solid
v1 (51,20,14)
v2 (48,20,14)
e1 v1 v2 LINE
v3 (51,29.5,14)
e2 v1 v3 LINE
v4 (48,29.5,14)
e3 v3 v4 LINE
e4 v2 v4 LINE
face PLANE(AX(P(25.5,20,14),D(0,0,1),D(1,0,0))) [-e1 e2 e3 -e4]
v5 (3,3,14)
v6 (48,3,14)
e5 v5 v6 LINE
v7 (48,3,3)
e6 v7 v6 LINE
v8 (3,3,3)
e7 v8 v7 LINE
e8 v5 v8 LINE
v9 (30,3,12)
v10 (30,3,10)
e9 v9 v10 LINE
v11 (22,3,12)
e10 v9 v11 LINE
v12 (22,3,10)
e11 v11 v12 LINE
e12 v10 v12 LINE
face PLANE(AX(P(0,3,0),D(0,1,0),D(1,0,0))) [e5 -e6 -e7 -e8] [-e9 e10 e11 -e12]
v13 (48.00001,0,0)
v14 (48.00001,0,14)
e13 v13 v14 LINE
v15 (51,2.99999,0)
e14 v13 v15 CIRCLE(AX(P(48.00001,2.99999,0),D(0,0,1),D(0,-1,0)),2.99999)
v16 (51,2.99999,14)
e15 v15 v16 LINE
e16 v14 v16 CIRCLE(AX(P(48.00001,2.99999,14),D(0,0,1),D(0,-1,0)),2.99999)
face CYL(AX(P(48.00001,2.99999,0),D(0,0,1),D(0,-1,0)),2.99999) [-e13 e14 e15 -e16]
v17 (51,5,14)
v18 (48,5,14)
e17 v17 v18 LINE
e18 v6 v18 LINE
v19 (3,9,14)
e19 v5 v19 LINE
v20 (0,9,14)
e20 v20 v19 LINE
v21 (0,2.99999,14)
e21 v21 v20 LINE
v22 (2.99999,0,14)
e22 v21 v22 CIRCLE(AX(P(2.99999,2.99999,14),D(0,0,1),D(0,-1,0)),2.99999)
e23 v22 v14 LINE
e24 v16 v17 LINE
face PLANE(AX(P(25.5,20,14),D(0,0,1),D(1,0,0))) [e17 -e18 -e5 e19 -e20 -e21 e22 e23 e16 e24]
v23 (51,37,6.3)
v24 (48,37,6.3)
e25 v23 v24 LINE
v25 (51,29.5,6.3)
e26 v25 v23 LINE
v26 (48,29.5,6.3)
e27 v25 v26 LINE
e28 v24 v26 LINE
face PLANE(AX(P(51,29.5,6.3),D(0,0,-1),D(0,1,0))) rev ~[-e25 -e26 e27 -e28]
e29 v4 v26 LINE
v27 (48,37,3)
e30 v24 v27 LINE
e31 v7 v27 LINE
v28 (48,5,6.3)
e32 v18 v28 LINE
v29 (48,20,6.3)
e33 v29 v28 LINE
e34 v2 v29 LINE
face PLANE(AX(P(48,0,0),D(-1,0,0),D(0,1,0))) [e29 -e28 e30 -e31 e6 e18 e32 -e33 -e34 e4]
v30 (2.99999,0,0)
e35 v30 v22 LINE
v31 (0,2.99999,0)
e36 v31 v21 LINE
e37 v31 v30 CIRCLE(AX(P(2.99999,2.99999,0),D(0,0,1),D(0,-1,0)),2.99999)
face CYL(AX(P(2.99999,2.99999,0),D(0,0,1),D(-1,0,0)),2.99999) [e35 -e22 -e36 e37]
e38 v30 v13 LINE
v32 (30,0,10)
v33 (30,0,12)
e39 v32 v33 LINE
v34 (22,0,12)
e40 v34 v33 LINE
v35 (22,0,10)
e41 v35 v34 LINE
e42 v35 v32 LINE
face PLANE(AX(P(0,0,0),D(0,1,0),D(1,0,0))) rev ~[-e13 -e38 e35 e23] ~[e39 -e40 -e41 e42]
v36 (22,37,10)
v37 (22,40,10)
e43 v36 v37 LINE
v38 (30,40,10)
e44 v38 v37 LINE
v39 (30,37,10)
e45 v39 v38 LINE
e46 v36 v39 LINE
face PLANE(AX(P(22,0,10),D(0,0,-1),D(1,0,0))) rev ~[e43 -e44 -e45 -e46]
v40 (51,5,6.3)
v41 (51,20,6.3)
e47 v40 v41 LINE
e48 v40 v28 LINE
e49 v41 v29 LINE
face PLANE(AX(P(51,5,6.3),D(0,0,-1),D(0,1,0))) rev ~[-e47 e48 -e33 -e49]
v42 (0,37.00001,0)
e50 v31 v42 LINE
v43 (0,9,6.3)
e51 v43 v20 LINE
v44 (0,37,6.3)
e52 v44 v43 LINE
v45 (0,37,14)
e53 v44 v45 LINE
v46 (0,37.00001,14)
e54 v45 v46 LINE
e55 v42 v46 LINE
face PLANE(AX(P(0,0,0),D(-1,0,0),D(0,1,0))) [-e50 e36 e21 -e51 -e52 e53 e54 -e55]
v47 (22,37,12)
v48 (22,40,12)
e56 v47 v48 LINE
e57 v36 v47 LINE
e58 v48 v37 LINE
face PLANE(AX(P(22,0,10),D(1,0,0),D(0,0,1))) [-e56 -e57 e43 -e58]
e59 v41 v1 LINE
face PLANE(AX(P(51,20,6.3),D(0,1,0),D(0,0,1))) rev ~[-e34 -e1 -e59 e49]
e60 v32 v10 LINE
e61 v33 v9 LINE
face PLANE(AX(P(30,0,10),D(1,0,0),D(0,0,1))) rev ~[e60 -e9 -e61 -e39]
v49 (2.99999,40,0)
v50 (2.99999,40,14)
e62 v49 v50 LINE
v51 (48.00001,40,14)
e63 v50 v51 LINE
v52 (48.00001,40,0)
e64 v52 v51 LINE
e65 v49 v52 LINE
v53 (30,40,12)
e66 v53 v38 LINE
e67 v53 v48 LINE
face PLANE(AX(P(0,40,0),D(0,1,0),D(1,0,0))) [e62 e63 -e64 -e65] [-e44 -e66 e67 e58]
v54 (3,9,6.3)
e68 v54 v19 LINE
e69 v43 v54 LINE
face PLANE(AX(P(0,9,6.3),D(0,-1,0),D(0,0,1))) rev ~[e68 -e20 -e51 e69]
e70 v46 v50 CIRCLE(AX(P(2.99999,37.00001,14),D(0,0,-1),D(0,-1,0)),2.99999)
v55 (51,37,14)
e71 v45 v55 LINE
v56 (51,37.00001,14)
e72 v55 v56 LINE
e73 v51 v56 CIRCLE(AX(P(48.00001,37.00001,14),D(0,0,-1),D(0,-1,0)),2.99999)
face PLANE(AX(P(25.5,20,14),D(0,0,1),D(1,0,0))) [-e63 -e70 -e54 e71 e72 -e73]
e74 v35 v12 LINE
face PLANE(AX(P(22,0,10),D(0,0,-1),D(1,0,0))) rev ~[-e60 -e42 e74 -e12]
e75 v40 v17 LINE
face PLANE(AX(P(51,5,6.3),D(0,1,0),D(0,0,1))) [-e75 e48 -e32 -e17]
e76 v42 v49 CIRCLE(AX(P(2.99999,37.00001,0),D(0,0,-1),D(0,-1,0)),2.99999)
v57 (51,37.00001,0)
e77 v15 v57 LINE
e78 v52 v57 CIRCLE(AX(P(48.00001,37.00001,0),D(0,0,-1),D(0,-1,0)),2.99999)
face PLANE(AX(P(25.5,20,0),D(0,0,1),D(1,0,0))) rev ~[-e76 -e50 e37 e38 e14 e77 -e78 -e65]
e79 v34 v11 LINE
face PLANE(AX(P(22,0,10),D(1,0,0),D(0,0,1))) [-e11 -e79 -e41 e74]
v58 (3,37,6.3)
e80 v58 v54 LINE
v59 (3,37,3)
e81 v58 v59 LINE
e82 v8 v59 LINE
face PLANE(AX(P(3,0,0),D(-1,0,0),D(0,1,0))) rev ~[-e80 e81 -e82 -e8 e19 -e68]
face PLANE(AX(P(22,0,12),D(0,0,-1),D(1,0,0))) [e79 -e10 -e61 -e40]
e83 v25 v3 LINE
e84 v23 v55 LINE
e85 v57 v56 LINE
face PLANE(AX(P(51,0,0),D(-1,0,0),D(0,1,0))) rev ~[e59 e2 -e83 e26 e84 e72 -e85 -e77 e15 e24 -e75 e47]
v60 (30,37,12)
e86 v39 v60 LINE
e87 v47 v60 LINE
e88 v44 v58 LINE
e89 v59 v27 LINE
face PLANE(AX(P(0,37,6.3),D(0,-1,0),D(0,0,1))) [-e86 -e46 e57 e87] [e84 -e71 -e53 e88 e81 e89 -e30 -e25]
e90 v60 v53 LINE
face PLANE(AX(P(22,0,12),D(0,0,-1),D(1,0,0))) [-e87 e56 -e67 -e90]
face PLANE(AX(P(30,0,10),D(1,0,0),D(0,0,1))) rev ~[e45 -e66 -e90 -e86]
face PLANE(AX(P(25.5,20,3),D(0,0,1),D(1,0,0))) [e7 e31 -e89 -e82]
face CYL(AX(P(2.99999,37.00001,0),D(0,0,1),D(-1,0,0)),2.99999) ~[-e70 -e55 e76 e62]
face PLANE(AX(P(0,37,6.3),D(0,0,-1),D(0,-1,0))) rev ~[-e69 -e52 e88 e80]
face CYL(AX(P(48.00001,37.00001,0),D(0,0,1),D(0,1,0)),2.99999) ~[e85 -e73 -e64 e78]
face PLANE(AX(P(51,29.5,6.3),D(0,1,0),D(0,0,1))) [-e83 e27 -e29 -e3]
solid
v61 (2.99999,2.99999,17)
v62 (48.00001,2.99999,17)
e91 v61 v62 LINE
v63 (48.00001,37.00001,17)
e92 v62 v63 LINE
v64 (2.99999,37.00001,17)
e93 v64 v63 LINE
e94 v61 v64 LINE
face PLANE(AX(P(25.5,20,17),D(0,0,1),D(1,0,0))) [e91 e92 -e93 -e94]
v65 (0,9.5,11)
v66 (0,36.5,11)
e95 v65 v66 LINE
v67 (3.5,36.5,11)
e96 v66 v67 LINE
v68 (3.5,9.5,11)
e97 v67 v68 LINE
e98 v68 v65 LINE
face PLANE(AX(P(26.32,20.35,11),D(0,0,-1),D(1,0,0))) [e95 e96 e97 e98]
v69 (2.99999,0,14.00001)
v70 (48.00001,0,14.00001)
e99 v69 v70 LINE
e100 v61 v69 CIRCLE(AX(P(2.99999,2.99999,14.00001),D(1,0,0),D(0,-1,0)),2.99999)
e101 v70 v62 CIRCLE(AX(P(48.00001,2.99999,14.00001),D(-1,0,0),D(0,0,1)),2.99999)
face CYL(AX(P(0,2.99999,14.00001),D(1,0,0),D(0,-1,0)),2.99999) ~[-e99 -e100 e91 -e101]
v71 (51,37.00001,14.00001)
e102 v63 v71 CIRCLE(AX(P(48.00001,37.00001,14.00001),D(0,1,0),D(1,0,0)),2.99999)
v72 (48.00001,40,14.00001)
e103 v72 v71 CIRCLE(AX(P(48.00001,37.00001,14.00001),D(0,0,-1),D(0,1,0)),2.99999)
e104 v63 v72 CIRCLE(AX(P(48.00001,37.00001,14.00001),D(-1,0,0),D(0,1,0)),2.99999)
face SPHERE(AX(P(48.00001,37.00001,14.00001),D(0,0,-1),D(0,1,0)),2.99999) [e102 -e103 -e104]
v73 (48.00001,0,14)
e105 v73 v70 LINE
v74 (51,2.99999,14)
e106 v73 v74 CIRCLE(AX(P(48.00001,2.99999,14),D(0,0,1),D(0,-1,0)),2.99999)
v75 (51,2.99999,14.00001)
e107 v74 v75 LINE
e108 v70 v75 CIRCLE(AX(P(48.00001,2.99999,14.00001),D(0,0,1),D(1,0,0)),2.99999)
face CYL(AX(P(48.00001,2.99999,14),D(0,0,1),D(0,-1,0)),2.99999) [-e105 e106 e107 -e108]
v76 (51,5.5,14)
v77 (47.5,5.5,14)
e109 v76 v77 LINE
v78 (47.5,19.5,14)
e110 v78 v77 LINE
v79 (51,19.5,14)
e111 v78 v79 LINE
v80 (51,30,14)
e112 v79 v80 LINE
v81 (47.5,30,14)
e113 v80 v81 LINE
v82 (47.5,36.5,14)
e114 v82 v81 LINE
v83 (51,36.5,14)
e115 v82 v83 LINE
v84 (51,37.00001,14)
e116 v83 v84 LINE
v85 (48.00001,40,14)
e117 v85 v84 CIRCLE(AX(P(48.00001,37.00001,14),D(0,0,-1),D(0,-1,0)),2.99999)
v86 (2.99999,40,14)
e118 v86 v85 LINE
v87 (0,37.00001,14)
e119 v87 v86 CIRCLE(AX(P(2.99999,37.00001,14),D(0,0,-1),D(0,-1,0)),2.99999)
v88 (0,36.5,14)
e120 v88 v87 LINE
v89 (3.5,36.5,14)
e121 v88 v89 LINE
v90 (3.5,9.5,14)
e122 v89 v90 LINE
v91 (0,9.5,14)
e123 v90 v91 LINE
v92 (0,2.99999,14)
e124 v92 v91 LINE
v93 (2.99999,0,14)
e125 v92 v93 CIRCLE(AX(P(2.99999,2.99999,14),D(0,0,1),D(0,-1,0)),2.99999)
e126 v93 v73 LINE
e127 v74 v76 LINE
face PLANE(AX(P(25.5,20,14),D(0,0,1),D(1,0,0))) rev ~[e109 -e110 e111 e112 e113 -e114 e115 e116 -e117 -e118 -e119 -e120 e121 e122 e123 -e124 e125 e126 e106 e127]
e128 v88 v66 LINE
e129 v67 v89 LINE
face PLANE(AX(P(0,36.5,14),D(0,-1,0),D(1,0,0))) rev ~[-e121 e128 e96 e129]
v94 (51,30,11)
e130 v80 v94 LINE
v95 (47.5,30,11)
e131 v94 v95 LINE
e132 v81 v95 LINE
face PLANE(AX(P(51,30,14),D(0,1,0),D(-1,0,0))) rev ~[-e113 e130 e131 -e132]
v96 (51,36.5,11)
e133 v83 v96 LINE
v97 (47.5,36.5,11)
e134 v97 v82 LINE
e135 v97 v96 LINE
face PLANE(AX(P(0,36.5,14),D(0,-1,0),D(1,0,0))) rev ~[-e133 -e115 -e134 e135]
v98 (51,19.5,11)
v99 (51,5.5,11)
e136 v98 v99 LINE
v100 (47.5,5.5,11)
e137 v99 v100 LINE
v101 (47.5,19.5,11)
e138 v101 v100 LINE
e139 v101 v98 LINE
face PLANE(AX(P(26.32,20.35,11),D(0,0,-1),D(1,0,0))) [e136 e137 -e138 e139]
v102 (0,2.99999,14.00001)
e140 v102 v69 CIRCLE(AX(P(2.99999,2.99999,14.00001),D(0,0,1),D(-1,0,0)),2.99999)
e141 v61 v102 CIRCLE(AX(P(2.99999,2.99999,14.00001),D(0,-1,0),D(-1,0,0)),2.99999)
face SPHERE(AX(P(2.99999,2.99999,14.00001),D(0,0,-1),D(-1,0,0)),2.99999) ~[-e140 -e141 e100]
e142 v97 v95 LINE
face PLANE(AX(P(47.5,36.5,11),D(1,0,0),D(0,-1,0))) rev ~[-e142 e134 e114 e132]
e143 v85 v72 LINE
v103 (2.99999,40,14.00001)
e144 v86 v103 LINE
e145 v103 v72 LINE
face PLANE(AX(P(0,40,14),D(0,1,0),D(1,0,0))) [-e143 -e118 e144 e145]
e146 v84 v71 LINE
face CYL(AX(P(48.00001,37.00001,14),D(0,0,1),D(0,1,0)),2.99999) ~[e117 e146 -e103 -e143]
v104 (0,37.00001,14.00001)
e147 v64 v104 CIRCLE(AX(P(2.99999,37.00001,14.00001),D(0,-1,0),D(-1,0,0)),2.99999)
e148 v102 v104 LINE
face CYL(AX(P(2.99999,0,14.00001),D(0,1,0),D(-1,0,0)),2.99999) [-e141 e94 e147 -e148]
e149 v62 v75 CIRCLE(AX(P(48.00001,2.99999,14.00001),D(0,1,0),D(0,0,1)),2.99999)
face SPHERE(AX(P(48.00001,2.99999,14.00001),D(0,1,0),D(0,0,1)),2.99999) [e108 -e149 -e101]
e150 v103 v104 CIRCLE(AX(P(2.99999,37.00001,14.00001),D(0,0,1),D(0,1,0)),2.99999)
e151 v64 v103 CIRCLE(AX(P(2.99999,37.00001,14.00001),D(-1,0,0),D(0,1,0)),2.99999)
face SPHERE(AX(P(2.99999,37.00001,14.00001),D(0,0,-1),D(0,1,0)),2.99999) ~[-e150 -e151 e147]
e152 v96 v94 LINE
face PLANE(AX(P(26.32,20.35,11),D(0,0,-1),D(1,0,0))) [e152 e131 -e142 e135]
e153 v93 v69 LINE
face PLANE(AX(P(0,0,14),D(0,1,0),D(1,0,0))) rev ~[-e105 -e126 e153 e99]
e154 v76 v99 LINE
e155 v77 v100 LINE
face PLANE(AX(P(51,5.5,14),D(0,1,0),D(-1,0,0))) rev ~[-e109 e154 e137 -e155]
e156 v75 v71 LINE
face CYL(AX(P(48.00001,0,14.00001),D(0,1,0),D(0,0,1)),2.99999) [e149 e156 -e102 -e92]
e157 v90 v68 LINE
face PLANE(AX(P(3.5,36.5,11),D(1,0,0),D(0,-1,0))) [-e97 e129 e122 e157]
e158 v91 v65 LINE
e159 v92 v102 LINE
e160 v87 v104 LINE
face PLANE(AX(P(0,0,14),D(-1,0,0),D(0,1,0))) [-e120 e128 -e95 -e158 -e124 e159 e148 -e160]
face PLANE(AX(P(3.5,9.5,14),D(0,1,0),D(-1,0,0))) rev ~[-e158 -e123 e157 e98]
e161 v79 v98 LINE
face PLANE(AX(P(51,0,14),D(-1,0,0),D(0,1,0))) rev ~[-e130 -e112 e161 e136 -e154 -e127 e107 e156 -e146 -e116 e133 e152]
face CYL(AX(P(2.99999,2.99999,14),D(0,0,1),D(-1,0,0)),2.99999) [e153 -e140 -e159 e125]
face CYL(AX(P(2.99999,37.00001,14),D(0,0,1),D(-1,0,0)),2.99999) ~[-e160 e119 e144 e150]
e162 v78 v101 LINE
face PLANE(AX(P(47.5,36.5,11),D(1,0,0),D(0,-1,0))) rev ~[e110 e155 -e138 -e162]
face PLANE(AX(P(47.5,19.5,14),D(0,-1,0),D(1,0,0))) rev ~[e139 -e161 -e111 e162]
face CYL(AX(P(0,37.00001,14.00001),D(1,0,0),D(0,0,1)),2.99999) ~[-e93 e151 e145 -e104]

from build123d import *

# Parameters (mm, degrees)
F0_W      = 51
F0_H      = 40
F1_DEPTH  = 14
F2_T      = -3
F3_W      = 7.5
F3_H      = 7.7
F3_W_2    = 15
F4_DEPTH  = 25
F5_W      = 28
F5_H      = 7.7
F6_DEPTH  = 25
F7_W      = 8
F7_H      = 2
F8_DEPTH  = 40.001
F9_R      = 2.99999
F10_W     = 51
F10_H     = 40
F11_DEPTH = 3
F13_DEPTH = 3
F14_W     = 44
F14_H     = 33
F15_DEPTH = 3
F16_R     = 2.99999


# Not quite as in the source:
# - a fillet or chamfer is up to 0.001 mm smaller than in the source, because OpenCascade refuses the exact size


with BuildPart() as f1:
    # F0 (on Top) → F1 (new body)
    with BuildSketch(Plane.XY):
        with Locations((25.5, 20)):
            Rectangle(F0_W, F0_H)
    extrude(amount=F1_DEPTH)

    # F2
    f2_openings = [f1.faces().sort_by_distance(p)[0] for p in [
        (25.5, 20, 14),
    ]]
    offset(amount=F2_T, openings=f2_openings)

    # F3 (on face) → F4 (cut)
    with BuildSketch(Plane.YZ.offset(51)):
        with Locations((33.25, 10.15)):
            Rectangle(F3_W, F3_H)
        with Locations((12.5, 10.15)):
            Rectangle(F3_W_2, F3_H)
    extrude(amount=-F4_DEPTH, mode=Mode.SUBTRACT)

    # F5 (on face) → F6 (cut)
    with BuildSketch(Plane(origin=(0, 0, 0), x_dir=(0, -1, 0), z_dir=(-1, 0, 0))):
        with Locations((-23, 10.15)):
            Rectangle(F5_W, F5_H)
    extrude(amount=-F6_DEPTH, mode=Mode.SUBTRACT)

    # F7 (on face) → F8 (cut, through all)
    with BuildSketch(Plane.XZ):
        with Locations((26, 11)):
            Rectangle(F7_W, F7_H)
    extrude(amount=-F8_DEPTH, mode=Mode.SUBTRACT)

    # F9 (radius 3 in the source; OpenCascade refuses exactly that, so slightly less here)
    f9_edges = [f1.edges().sort_by_distance(p)[0] for p in [
        (0, 0, 7),
        (51, 0, 7),
        (51, 40, 7),
        (0, 40, 7),
    ]]
    fillet(f9_edges, radius=F9_R)


with BuildPart() as f11:
    # F10 (on face) → F11 (new body)
    with BuildSketch(Plane.XY.offset(14)):
        with Locations((25.5, 20)):
            Rectangle(F10_W, F10_H)
    extrude(amount=F11_DEPTH)

    # F12 (on face) → F13 (join)
    with BuildSketch(Plane(origin=(0, 0, 14), x_dir=(1, 0, 0), z_dir=(0, 0, -1))):
        Polygon((0, -36.5), (3.5, -36.5), (47.5, -36.5), (51, -36.5), (51, -30), (47.5, -30), (47.5, -19.5), (51, -19.5), (51, -5.5), (47.5, -5.5), (47.5, -3.5), (3.5, -3.5), (3.5, -9.5), (0, -9.5), align=None)
    extrude(amount=F13_DEPTH)

    # F14 (on face) → F15 (cut)
    with BuildSketch(Plane(origin=(0, 0, 11), x_dir=(1, 0, 0), z_dir=(0, 0, -1))):
        with Locations((25.5, -20)):
            Rectangle(F14_W, F14_H)
    extrude(amount=-F15_DEPTH, mode=Mode.SUBTRACT)

    # F16 (radius 3 in the source; OpenCascade refuses exactly that, so slightly less here)
    f16_edges = [f11.edges().sort_by_distance(p)[0] for p in [
        (0, 40, 15.5),
        (51, 40, 15.5),
        (25.5, 40, 17),
        (51, 20, 17),
        (0, 0, 15.5),
        (0, 20, 17),
        (25.5, 0, 17),
        (51, 0, 15.5),
    ]]
    fillet(f16_edges, radius=F16_R)


solid = Compound([f1.part, f11.part])
